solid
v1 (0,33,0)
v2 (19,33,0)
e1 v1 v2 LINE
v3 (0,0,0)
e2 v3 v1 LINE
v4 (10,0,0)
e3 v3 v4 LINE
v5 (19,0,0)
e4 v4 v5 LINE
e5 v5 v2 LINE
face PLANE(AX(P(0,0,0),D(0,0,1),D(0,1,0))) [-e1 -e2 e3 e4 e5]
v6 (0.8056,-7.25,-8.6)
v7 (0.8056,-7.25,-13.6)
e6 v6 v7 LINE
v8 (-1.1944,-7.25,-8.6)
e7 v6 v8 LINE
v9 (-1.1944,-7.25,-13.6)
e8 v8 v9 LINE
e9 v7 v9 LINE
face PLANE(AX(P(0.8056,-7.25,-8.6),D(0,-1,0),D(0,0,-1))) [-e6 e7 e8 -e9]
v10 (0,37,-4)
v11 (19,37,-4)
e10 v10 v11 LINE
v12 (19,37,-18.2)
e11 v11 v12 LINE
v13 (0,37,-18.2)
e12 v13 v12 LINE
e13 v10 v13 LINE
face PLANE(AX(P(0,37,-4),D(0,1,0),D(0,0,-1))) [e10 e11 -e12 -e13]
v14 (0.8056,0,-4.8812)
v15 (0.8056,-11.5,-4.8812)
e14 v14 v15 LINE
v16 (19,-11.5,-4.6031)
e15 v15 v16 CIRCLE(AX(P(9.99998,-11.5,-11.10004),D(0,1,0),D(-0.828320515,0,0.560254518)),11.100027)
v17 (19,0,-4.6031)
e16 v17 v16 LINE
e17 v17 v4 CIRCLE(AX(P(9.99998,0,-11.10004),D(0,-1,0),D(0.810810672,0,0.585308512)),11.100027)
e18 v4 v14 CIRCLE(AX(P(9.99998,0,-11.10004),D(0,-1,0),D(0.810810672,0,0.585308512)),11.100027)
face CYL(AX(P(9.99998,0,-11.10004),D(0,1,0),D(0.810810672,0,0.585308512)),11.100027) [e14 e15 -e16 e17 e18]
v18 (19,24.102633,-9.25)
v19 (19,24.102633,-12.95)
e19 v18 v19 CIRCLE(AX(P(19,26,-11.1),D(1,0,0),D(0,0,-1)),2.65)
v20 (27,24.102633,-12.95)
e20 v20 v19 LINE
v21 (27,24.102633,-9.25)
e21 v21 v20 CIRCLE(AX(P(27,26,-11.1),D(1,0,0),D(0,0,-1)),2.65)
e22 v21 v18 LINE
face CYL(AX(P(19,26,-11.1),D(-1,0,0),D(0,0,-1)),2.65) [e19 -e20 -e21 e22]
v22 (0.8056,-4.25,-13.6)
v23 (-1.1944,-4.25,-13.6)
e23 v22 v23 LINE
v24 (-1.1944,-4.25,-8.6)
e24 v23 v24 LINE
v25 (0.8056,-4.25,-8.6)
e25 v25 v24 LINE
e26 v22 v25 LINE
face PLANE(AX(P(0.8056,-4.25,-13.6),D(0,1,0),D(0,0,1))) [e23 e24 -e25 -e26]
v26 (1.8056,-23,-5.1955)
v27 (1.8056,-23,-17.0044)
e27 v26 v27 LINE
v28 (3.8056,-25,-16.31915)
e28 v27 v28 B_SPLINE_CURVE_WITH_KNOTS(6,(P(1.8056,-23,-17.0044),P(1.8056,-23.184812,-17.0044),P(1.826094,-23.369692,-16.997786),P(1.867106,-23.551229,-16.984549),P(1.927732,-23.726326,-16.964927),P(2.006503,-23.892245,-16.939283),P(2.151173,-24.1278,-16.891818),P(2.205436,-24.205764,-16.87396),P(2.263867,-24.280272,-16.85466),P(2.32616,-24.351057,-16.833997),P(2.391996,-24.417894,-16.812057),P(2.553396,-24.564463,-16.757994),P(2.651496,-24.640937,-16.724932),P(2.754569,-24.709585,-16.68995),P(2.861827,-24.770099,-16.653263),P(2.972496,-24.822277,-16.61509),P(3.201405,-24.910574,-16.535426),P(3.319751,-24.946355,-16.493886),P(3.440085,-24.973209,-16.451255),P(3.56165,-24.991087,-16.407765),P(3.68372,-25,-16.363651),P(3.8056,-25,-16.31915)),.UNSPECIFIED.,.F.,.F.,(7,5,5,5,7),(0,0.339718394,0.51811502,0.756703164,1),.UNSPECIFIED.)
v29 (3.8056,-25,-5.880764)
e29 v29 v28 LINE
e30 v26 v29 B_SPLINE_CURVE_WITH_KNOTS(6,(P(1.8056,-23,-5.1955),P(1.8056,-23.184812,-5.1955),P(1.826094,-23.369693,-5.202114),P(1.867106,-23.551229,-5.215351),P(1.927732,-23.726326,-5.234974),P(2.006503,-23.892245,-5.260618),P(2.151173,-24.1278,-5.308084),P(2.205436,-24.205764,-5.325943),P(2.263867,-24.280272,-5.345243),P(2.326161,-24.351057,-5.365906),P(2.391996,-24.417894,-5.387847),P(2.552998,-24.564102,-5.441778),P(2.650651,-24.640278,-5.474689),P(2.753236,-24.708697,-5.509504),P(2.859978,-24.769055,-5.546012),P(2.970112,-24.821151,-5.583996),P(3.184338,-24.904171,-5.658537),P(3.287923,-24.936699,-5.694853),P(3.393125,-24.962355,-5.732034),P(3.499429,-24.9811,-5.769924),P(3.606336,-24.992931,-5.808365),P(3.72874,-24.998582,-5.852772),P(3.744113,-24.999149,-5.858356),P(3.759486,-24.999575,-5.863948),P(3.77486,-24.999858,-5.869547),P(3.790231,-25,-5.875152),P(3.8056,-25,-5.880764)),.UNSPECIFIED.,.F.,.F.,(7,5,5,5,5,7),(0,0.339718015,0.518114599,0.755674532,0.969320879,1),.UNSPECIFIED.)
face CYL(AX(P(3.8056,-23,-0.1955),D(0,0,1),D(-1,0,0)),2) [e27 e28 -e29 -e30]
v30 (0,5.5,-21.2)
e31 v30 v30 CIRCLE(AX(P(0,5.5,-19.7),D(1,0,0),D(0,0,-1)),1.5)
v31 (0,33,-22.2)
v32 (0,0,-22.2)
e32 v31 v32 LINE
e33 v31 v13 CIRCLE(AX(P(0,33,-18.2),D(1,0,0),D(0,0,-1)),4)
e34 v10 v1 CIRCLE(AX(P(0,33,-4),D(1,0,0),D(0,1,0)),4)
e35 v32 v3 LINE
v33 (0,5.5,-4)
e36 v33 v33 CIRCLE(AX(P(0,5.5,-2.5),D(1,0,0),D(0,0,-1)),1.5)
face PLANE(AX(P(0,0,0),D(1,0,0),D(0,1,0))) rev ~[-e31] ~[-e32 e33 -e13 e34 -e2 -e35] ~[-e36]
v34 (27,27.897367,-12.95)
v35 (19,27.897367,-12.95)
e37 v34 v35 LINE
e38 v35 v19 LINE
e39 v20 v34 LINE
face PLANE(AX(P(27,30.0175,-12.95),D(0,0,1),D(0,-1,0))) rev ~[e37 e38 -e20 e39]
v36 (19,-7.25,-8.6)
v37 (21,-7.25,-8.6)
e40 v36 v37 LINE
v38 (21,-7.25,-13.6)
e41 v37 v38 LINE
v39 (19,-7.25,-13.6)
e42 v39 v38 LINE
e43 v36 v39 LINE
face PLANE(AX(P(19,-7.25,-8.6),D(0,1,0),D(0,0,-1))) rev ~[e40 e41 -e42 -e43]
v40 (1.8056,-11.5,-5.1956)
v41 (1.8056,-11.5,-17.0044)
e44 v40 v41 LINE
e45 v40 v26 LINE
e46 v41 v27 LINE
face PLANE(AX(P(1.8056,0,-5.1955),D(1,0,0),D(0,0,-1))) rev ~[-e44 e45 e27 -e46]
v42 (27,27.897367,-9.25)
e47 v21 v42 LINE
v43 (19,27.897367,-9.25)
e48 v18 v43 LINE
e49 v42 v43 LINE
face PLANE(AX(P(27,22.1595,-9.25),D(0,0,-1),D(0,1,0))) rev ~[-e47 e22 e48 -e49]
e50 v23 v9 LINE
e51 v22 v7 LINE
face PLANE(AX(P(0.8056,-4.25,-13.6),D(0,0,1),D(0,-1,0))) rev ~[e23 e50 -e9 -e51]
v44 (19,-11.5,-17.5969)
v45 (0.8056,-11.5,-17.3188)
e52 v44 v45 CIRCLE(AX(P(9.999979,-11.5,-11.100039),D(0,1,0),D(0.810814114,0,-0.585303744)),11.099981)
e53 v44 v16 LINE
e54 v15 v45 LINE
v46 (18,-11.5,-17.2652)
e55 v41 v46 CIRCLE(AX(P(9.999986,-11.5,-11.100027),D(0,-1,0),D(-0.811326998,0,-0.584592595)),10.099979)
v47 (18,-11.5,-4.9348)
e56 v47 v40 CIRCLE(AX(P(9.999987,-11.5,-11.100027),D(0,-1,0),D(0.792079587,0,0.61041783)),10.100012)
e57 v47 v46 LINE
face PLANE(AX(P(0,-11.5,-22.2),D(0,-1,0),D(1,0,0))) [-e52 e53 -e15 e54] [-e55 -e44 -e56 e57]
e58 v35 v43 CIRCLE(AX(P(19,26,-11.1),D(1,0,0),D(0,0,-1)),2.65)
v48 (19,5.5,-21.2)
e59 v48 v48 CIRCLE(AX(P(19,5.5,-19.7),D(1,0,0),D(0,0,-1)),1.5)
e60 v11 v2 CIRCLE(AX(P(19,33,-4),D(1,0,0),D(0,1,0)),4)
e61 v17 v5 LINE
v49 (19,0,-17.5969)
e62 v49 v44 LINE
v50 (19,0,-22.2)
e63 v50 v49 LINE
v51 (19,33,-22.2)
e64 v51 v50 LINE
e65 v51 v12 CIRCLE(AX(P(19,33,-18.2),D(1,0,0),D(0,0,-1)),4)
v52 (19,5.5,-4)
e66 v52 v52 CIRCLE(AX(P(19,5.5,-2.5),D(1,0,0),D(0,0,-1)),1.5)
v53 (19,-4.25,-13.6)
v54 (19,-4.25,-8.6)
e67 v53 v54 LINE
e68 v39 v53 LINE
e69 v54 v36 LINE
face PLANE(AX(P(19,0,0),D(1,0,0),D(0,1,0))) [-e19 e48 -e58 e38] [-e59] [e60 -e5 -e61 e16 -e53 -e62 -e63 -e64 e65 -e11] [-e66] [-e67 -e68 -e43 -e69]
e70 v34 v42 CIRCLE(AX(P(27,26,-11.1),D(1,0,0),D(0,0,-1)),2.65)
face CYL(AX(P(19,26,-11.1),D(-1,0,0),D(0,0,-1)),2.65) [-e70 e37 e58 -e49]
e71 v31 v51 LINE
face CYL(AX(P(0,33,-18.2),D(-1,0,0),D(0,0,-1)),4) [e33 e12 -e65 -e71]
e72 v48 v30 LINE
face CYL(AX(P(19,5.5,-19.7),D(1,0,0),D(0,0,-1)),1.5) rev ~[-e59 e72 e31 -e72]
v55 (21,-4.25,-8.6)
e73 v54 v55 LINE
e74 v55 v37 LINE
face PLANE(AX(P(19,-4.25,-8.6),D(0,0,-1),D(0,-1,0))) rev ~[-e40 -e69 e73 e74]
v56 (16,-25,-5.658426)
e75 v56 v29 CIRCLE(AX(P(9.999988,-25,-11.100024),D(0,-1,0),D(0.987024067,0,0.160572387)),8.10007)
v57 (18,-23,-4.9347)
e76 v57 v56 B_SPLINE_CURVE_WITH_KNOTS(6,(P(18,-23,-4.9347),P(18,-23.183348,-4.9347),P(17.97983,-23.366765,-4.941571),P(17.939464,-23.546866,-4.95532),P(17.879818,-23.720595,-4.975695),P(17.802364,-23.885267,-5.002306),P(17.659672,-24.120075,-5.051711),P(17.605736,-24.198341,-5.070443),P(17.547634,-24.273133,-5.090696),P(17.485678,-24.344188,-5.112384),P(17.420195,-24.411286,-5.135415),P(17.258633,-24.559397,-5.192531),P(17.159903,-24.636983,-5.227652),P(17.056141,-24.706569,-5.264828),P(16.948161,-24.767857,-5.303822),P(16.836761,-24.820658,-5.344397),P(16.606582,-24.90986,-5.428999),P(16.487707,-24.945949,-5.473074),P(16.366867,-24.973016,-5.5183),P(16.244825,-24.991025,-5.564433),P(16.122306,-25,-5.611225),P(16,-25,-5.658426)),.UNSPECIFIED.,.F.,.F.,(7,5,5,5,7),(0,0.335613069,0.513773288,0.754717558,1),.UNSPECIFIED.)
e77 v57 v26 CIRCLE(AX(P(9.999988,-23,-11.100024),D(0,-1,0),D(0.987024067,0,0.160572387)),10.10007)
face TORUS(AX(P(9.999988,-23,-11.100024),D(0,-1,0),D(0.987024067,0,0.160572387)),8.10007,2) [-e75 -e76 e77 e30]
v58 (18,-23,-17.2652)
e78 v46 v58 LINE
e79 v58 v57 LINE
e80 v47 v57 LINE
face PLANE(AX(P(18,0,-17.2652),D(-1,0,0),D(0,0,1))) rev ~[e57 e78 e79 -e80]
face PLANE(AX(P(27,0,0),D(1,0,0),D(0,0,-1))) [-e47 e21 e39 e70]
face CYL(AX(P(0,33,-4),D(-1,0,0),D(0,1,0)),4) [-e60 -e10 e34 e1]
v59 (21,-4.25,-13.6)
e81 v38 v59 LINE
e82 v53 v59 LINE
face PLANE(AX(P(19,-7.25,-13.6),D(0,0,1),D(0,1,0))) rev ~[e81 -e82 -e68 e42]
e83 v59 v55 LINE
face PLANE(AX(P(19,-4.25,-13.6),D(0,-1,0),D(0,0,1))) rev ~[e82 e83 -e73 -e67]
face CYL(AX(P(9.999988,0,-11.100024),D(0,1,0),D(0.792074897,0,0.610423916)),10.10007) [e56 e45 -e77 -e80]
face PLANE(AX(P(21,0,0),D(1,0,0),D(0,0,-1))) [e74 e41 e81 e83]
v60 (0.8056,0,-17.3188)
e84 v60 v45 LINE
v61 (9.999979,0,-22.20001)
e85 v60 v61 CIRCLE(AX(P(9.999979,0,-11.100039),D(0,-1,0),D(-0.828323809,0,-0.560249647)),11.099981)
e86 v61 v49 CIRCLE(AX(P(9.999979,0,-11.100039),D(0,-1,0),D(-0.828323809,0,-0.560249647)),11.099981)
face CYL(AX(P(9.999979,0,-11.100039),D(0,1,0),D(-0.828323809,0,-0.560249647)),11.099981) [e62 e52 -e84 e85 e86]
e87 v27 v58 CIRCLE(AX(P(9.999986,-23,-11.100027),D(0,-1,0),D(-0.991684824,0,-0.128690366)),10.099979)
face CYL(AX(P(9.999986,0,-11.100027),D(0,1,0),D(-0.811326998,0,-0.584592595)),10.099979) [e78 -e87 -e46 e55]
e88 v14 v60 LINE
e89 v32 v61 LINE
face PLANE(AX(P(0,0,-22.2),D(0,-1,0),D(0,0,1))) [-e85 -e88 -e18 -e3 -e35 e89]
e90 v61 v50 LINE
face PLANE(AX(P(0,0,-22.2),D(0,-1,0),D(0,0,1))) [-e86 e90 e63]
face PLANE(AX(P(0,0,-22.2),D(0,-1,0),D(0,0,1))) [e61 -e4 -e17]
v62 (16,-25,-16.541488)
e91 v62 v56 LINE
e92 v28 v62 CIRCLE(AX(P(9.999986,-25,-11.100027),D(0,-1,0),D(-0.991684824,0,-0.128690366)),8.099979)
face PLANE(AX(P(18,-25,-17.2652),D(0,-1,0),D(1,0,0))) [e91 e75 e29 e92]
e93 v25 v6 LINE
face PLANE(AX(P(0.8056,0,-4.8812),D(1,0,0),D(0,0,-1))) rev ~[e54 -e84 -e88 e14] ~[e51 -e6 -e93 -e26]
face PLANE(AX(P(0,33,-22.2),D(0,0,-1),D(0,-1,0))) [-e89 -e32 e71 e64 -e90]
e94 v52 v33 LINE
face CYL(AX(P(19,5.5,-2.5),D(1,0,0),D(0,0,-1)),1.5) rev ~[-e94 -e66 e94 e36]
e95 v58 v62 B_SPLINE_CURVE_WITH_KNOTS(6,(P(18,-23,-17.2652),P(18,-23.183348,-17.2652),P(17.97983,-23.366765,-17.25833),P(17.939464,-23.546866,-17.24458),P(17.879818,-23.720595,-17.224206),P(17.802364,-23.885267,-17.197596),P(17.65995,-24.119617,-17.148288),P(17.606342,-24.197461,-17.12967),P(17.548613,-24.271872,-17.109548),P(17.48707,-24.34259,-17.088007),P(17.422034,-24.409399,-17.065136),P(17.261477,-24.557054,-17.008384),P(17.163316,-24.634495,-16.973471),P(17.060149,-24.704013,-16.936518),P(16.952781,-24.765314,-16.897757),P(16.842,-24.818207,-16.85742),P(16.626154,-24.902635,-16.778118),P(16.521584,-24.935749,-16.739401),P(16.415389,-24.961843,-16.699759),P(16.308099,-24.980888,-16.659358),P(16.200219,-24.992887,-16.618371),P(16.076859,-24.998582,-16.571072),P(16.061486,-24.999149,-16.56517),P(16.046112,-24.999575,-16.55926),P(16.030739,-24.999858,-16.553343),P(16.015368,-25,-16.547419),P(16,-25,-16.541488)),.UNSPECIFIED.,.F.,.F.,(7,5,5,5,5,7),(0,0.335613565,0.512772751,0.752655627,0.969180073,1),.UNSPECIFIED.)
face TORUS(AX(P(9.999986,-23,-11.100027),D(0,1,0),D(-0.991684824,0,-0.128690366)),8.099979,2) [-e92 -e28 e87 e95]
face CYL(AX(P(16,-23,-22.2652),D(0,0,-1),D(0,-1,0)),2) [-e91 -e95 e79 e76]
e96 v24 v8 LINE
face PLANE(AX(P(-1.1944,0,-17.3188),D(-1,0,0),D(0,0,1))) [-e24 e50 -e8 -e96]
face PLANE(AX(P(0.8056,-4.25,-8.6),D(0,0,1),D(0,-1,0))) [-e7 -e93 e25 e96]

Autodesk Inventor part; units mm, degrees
ref_plane "YZ Plane" through (0, 0, 0) normal (1, 0, 0) x (0, 1, 0)
ref_plane "XZ Plane" through (0, 0, 0) normal (0, 1, 0) x (-1, 0, 0)
ref_plane "XY Plane" through (0, 0, 0) normal (0, 0, 1) x (1, 0, 0)
sketch "Sketch1" plane through (0, 0, 0) normal (1, 0, 0) x (0, 1, 0)
  line L0 (0, 0) -> (33, 0)
  line L1 (37, -4) -> (37, -18.2)
  line L2 (33, -22.2) -> (0, -22.2)
  line L3 (0, -22.2) -> (0, 0)
  arc A0 (33, -22.2) -> (37, -18.2) centre (33, -18.2) ccw
  arc A1 (37, -4) -> (33, 0) centre (33, -4) ccw
extrude "Extrusion1" add sketch "Sketch1" along normal blind 19
sketch "Sketch2" plane through (19, 0, 0) normal (1, 0, 0) x (0, 0, -1)
  line L0 (0, 33) -> (0, 0) projected
  line L1 (22.2, 37) -> (0, 37)
  line L2 (0, 37) -> (0, 26)
  line L3 (22.2, 26) -> (22.2, 37)
  line L4 (0, 31.5) -> (0, 26)
  circle A0 centre (11.1, 26) radius 2.65
  dimension "d9" = 11
  dimension "d11" = 5.3
extrude "Extrusion2" add sketch "Sketch2" along normal blind 8
sketch "Sketch3" plane through (27, 26, -11.1) normal (1, 0, 0) x (0, 0, -1)
  line L0 (1.85, 0) -> (1.85, -3.8405)
  line L1 (1.85, -3.8405) -> (0, -3.8405)
  line L2 (1.85, -3.8405) -> (-1.85, -3.8405)
  line L3 (-1.85, -3.8405) -> (-1.85, 4.0175)
  line L4 (-1.85, 4.0175) -> (1.85, 4.0175)
  line L5 (1.85, 4.0175) -> (1.85, -3.8405)
  line L6 (1.85, 4.0175) -> (3.7589, 4.0175)
  line L7 (3.7589, 4.0175) -> (3.7589, -3.8405)
  line L8 (3.7589, -3.8405) -> (1.85, -3.8405)
  line L9 (1.85, -3.8405) -> (1.85, 4.0175)
  line L10 (-1.85, 4.0175) -> (-3.5435, 4.0175)
  line L11 (-3.5435, 4.0175) -> (-3.5435, -3.8405)
  line L12 (-3.5435, -3.8405) -> (-1.85, -3.8405)
  line L13 (-1.85, -3.8405) -> (-1.85, 4.0175)
  point P0 (-11.1, -26)
  dimension "d14" = 1.85
  dimension "d15" = 3.7
extrude "Extrusion3" cut sketch "Sketch3" against normal blind 8 contours L5 L6 L7 L8 L0 | L3 L12 L11 L10
sketch "Sketch4" plane through (19, 0, 0) normal (1, 0, 0) x (0, 0, -1)
  line L0 (0, 0) -> (22.2, 0) projected
  line L1 (0, 0) -> (22.2, 0)
  line L2 (22.2, 0) -> (22.2, 5.5)
  line L3 (0, 5.5) -> (0, 0)
  circle A0 centre (2.5, 5.5) radius 1.5
  circle A1 centre (19.7, 5.5) radius 1.5
  dimension "d18" = 5.5
  dimension "d20" = 3
  dimension "d22" = 3
extrude "Extrusion4" cut sketch "Sketch4" against normal blind 20
sketch "Sketch5" plane through (0, 0, -22.2) normal (0, -1, 0) x (1, 0, 0)
  line L0 (0, 22.2) -> (19, 22.2) projected
  line L1 (0, 0) -> (19, 0) projected
  line L2 (19, 18.2) -> (19, 22.2) projected
  line L3 (19, 22.2) -> (10, 22.2)
  line L4 (18, 0) -> (19, 0)
  line L5 (19, 4.6031) -> (19, 17.5969)
  line L6 (0.8056, 17.3188) -> (0.8056, 4.8812)
  arc A0 (0.8056, 4.8812) -> (19, 4.6031) centre (10, 11.1) ccw
  arc A1 (19, 17.5969) -> (0.8056, 17.3188) centre (10, 11.1) ccw
  arc A2 (1.8056, 5.1956) -> (18, 4.9348) centre (10, 11.1) ccw
  arc A3 (18, 17.2652) -> (1.8056, 17.0044) centre (10, 11.1) ccw
  line L7 (1.8056, 17.0044) -> (1.8056, 5.1956)
  line L8 (0.8056, 4.8812) -> (0.8056, 17.3188)
  line L9 (18, 17.2652) -> (18, 4.9348)
  line L10 (19, 4.6031) -> (19, 17.5969)
extrude "Extrusion5" add sketch "Sketch5" along normal blind 11.5
sketch "Sketch6" plane through (18, 0, -17.2652) normal (0, -1, 0) x (1, 0, 0)
  line L0 (-16.1944, 12.0697) -> (-16.1944, 0.2608) projected
  arc A0 (-16.1944, 0.2608) -> (0, 0) centre (-8, 6.1652) ccw projected
  line L1 (0, 0) -> (0, 12.3305) projected
  arc A1 (0, 12.3305) -> (-16.1944, 12.0697) centre (-8, 6.1652) ccw projected
  line L2 (-16.1944, 12.0697) -> (-16.1944, 0.2608) projected
  arc A2 (-16.1944, 0.2608) -> (0, 0) centre (-8, 6.1652) ccw projected
  line L3 (0, 0) -> (0, 12.3305) projected
  arc A3 (0, 12.3305) -> (-16.1944, 12.0697) centre (-8, 6.1652) ccw projected
  point P0 (-18, 17.2652)
extrude "Extrusion6" add sketch "Sketch6" along normal blind 25
fillet "Fillet1" radius 2 4 edges at (18, -25, -11.1) (9.8374, -25, -21.1987) (1.8056, -25, -11.1) (9.8374, -25, -1.0013)
sketch "Sketch7" plane through (19, 0, 0) normal (1, 0, 0) x (0, 0, -1)
  line L0 (4.6031, 0) -> (4.6031, -11.5) projected
  line L1 (17.5969, 0) -> (17.5969, -11.5) projected
  line L2 (22.2, 0) -> (0, 0) projected
  line L3 (13.6, -4.25) -> (8.6, -4.25)
  line L4 (8.6, -4.25) -> (8.6, -7.25)
  line L5 (8.6, -7.25) -> (13.6, -7.25)
  line L6 (13.6, -7.25) -> (13.6, -4.25)
  line L7 (13.6, -4.25) -> (8.6, -7.25) construction
  line L8 (8.6, -4.25) -> (13.6, -7.25) construction
  dimension "d33" = 5
  dimension "d34" = 3
extrude "Extrusion7" add sketch "Sketch7" along normal blind 2
sketch "Sketch8" plane through (0.8056, 0, -17.3188) normal (-1, 0, 0) x (0, 0, 1)
  line L0 (-4.8812, 0) -> (17.3188, 0) projected
  line L1 (3.7188, -4.25) -> (3.7188, -7.25) projected
  line L2 (8.7188, -7.25) -> (3.7188, -7.25)
  line L3 (3.7188, -7.25) -> (3.7188, -4.25)
  line L4 (3.7188, -4.25) -> (8.7188, -4.25)
  line L5 (8.7188, -4.25) -> (8.7188, -7.25)
  line L6 (8.7188, -7.25) -> (3.7188, -4.25) construction
  line L7 (3.7188, -7.25) -> (8.7188, -4.25) construction
  point P0 (6.2188, -5.75)
extrude "Extrusion8" add sketch "Sketch8" along normal blind 2
scale "Scale1" factors (2, 2, 2) then translate (-19, -12.75, 11.1) bodies 1
scale "Scale2" factors (0.5, 0.5, 0.5) then translate (9.5, 6.375, -5.55) bodies 1
properties part number "DCMotor"
